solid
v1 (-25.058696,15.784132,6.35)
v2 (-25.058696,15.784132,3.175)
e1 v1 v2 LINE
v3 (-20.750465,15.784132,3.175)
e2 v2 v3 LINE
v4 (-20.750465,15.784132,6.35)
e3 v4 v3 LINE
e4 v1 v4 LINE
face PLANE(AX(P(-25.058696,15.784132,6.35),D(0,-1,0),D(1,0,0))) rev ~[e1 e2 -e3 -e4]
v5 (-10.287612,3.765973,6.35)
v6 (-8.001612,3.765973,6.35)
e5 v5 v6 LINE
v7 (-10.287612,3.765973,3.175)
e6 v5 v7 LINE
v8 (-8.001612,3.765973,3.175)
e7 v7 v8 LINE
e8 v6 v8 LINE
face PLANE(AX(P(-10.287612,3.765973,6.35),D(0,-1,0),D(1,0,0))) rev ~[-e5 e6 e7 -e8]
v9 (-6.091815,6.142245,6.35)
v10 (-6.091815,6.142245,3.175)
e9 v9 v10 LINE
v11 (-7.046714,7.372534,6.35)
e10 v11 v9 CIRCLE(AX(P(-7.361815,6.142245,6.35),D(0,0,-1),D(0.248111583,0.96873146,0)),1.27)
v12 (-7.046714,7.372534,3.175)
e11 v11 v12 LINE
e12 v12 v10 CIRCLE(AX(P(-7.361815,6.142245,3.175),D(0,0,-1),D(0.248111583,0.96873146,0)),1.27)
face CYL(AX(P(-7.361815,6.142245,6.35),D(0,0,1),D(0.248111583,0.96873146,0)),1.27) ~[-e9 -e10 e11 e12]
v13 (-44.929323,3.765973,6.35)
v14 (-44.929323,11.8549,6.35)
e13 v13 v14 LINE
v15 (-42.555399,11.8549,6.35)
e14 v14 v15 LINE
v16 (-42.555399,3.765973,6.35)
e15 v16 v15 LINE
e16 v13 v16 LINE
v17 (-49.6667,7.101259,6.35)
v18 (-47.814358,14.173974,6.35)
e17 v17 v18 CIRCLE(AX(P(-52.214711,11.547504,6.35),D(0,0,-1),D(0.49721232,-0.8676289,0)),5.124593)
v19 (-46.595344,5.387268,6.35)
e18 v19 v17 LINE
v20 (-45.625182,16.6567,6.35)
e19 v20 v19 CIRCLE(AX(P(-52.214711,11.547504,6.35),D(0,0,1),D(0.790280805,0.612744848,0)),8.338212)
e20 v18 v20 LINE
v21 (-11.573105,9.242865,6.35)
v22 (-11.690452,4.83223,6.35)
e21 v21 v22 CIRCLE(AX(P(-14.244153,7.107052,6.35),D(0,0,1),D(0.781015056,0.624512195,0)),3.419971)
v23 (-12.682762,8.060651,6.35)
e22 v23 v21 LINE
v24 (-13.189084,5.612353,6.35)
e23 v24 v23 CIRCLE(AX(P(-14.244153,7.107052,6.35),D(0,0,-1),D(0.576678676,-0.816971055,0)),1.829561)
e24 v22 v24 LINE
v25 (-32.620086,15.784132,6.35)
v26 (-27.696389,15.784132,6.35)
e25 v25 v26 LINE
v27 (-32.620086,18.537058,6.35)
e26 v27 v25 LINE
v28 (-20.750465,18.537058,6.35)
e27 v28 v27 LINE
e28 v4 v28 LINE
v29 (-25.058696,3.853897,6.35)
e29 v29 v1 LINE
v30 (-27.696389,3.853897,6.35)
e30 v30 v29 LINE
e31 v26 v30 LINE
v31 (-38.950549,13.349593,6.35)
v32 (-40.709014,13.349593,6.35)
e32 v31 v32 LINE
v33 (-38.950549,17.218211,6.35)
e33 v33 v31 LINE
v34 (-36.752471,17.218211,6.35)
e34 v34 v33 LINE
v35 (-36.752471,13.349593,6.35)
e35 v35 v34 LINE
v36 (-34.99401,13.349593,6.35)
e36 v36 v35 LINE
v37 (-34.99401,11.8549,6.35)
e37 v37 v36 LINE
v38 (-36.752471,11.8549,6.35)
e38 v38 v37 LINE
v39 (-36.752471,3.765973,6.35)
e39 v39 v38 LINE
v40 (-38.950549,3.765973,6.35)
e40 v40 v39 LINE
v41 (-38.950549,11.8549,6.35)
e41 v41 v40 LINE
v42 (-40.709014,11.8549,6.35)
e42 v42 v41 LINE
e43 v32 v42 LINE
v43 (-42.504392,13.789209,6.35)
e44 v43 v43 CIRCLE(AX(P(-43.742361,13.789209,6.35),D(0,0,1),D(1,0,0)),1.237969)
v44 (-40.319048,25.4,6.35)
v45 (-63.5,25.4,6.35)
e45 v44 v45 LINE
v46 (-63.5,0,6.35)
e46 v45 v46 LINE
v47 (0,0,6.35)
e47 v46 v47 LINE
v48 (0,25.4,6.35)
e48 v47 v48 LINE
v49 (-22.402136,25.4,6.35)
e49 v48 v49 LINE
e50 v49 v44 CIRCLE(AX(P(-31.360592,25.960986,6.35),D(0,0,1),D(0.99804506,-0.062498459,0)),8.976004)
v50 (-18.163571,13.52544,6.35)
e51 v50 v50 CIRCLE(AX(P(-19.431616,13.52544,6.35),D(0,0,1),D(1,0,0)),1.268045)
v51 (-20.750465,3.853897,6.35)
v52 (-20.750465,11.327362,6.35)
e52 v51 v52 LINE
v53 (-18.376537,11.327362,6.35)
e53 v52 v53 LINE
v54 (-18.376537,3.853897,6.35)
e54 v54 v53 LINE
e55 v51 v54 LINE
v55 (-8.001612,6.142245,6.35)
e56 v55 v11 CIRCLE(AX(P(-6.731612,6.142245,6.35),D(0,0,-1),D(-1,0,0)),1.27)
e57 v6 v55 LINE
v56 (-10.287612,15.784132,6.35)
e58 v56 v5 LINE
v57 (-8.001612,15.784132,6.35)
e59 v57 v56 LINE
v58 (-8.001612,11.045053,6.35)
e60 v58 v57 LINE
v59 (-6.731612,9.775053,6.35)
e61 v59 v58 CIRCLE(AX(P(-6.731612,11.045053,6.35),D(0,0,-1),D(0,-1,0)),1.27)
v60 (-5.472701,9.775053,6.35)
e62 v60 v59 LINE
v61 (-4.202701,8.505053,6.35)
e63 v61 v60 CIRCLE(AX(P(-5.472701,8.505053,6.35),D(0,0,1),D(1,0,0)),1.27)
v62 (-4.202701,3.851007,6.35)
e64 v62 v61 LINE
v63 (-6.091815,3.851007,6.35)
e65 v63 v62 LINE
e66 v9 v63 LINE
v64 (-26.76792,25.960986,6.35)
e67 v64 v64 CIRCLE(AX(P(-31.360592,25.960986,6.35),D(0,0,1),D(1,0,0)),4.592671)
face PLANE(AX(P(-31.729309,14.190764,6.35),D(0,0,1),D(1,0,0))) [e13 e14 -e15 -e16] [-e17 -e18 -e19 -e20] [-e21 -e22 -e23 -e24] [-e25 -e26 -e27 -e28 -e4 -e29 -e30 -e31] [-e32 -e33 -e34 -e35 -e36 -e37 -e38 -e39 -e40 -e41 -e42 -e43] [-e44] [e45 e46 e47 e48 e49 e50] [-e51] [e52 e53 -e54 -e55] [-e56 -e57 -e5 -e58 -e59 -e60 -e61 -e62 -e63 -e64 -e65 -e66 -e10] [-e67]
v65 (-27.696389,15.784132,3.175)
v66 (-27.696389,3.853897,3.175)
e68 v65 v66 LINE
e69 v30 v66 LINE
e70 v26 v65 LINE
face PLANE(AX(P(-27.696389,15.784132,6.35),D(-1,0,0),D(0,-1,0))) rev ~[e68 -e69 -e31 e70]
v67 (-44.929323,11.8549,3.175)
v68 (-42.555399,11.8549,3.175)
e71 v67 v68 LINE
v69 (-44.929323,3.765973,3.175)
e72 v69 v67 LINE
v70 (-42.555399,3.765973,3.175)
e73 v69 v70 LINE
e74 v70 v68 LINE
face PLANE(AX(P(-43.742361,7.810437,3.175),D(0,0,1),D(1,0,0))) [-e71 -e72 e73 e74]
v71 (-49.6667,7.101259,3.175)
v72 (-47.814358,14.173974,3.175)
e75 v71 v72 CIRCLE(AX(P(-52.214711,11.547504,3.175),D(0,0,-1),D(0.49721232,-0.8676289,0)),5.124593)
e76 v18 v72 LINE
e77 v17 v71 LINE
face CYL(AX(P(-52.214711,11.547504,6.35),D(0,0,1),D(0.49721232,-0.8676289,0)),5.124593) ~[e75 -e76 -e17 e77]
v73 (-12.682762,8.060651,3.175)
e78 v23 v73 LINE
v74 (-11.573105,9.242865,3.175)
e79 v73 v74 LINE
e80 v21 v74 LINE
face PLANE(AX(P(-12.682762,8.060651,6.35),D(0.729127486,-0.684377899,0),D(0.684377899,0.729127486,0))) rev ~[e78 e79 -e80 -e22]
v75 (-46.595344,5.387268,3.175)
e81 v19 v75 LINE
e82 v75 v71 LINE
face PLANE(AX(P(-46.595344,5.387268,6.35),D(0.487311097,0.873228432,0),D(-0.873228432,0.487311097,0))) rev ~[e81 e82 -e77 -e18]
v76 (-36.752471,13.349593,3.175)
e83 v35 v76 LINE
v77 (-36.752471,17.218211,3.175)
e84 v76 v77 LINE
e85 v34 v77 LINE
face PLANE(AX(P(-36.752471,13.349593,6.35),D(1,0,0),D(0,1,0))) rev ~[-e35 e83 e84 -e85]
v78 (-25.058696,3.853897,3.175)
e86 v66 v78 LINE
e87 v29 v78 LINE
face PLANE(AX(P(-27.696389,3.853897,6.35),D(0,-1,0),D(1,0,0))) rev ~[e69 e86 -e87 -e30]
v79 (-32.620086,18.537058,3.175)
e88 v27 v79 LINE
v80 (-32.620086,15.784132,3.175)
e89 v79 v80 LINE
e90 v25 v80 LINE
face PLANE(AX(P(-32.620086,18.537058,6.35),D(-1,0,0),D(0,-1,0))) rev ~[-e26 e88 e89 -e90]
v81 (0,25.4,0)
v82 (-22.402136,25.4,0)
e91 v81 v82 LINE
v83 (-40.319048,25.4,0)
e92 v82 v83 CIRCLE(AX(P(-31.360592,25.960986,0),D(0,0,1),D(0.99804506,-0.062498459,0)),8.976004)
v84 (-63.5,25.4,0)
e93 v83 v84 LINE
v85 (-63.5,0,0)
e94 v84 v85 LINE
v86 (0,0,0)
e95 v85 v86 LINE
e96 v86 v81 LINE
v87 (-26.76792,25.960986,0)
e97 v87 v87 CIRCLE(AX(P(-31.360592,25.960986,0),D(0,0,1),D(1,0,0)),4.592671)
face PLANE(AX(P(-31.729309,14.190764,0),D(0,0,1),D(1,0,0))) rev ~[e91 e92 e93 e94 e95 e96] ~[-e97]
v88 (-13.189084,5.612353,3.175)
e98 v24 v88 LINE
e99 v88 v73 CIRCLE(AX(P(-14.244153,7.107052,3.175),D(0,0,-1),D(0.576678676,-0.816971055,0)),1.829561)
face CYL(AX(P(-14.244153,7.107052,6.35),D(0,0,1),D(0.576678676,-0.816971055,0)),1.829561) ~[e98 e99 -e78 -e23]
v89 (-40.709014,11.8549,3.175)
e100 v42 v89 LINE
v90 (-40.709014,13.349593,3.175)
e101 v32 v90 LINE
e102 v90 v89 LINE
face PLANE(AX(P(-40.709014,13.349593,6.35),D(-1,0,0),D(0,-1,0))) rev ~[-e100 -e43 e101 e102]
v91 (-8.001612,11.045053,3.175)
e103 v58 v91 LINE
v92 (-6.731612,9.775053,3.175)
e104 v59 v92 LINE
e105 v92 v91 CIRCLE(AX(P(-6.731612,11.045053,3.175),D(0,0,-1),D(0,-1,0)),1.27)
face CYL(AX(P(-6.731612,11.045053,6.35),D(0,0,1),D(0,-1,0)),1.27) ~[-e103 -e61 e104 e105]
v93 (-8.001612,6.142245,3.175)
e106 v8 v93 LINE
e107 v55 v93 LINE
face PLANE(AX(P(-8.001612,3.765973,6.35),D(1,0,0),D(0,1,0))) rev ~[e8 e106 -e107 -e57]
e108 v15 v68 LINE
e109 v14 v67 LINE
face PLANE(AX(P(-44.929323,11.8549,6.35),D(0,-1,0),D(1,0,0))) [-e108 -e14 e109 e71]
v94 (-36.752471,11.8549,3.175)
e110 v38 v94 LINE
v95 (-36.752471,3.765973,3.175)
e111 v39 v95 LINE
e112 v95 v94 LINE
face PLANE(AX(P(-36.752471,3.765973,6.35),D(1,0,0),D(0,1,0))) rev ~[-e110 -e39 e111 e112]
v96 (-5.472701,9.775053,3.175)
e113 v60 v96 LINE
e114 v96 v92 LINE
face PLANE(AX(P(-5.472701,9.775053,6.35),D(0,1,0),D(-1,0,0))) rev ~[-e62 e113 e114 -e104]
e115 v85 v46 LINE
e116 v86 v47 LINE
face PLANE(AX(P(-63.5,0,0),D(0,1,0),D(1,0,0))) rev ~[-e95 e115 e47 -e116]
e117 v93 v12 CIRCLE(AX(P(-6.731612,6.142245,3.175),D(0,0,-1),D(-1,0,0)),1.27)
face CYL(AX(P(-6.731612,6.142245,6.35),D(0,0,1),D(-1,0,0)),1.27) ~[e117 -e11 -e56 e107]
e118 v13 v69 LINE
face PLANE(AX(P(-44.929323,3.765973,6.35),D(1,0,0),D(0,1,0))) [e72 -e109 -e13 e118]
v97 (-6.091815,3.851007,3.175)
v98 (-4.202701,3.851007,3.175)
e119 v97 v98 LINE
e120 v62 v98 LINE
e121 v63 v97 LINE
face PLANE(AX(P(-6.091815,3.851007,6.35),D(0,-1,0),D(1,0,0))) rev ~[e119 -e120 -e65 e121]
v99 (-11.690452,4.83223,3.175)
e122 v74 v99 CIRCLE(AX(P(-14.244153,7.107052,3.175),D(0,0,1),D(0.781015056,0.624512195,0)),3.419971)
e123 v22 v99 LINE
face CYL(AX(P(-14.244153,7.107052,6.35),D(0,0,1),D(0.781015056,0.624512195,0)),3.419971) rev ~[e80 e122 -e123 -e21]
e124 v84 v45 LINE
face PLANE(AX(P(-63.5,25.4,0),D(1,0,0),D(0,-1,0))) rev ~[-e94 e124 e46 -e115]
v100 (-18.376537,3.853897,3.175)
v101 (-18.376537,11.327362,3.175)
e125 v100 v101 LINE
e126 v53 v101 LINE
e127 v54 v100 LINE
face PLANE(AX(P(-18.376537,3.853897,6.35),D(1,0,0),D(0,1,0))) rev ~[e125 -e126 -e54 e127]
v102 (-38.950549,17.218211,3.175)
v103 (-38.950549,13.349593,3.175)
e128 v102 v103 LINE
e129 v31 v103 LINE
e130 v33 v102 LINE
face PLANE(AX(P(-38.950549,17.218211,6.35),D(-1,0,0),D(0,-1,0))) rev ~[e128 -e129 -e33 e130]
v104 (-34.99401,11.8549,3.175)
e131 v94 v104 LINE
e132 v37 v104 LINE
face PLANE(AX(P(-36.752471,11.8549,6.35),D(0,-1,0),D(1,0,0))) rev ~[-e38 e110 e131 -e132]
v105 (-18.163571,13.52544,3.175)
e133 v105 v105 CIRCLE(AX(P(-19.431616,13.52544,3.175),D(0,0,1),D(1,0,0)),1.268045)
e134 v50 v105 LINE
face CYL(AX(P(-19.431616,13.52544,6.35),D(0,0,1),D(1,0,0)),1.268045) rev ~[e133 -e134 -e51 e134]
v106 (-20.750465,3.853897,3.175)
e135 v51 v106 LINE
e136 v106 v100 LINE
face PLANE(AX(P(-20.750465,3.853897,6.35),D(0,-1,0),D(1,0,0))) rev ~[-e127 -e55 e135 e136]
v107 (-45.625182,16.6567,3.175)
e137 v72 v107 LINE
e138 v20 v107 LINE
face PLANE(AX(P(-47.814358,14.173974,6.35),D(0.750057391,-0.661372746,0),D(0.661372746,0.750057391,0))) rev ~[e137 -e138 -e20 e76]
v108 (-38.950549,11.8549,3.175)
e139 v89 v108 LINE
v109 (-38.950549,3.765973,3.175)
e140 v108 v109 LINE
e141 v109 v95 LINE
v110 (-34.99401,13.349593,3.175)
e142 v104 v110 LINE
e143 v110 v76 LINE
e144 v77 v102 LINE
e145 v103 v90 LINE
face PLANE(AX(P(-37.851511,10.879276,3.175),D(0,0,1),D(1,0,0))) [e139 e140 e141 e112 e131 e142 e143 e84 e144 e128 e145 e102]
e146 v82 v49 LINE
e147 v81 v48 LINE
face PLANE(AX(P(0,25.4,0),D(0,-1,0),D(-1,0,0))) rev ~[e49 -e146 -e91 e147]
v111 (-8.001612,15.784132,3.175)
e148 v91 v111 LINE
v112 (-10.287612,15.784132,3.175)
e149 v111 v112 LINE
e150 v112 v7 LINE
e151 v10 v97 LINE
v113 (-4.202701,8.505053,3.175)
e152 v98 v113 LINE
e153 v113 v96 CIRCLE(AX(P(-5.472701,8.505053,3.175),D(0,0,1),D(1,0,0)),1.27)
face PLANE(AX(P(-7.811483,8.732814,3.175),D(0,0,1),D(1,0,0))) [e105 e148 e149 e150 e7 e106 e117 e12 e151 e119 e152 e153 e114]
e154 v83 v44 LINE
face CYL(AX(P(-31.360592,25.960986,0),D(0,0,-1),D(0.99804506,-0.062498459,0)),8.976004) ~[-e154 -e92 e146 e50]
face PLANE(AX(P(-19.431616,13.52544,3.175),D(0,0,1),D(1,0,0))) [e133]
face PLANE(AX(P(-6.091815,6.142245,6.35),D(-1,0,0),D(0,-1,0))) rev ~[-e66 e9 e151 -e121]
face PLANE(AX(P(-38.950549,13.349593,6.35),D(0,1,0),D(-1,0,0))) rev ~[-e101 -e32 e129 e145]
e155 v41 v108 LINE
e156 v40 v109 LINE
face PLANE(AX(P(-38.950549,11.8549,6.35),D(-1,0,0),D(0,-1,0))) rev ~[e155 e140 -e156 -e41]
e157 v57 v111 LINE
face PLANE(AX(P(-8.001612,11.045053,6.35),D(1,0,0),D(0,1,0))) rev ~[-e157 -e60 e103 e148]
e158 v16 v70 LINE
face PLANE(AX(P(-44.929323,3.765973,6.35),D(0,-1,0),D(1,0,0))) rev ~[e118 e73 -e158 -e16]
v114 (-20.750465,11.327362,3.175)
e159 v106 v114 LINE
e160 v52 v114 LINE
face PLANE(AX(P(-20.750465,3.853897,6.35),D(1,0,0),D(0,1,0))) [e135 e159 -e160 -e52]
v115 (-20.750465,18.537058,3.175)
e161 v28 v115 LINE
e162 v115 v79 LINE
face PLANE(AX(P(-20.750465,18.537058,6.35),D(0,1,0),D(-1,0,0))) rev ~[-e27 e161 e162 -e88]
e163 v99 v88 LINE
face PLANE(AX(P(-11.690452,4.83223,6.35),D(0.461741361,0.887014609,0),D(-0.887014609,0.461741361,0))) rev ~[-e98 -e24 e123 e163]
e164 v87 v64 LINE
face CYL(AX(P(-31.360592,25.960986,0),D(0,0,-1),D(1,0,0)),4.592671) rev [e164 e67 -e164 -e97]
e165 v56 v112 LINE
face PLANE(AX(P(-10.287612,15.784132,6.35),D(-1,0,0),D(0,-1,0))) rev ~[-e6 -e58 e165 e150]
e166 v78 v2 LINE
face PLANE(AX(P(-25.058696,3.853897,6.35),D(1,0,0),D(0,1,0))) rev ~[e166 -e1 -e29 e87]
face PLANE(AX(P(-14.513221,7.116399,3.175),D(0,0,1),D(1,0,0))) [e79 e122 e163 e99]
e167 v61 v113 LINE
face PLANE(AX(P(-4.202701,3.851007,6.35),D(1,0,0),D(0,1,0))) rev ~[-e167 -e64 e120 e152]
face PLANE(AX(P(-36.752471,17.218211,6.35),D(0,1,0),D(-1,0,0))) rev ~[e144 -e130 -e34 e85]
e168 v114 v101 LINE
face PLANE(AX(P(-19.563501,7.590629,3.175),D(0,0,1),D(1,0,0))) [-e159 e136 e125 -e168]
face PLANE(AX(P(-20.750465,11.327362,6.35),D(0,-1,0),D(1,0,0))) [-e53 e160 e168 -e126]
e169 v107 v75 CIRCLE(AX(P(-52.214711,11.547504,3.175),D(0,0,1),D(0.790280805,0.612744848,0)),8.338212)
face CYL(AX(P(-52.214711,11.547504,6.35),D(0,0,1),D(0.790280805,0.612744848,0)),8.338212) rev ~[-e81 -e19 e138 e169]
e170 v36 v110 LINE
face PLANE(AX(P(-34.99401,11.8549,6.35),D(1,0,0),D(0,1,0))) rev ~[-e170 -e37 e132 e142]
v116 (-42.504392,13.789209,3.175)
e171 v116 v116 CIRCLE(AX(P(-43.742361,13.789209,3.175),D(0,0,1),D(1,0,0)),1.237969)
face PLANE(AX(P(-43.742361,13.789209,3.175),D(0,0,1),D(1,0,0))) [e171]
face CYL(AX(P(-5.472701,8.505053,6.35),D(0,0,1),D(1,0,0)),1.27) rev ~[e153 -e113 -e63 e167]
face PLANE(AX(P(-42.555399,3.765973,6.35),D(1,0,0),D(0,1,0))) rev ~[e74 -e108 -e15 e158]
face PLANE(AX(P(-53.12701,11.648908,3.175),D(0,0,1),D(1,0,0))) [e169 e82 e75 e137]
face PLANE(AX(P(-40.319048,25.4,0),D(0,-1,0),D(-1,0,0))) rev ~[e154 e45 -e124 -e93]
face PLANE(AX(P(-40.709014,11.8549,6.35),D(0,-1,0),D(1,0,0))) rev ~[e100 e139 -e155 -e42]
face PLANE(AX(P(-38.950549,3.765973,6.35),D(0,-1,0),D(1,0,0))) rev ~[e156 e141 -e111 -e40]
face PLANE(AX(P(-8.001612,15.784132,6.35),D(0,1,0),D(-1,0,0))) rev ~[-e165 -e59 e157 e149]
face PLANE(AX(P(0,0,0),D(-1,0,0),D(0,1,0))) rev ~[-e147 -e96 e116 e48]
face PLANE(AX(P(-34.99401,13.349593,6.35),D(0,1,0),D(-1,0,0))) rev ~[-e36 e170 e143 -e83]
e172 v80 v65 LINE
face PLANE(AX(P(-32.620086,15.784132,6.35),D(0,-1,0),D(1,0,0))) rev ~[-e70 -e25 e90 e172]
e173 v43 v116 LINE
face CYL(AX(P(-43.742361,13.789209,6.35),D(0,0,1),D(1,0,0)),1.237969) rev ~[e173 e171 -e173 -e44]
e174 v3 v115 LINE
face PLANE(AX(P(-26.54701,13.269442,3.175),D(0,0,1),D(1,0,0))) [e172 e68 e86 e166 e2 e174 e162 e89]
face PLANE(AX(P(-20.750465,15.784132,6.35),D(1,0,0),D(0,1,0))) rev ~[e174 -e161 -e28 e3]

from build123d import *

# Parameters (mm, degrees)
F0_R     = 4.5926712991
F1_DEPTH = 6.35
F2_W     = 2.3739238567
F2_H     = 8.0889270103
F2_W_2   = 2.3739274609
F2_H_2   = 7.4734649694
F2_R     = 1.2680453983
F2_R_2   = 1.2379691671
F3_DEPTH = 3.175


# Not quite as in the source:
# - a length typed as a fraction of an inch, garbled in the dataset ("3 / 203.2 mm" for 3/8 in), is restored


with BuildPart() as f1:
    # F0 (on Top) → F1 (new body)
    with BuildSketch(Plane.XY):
        with BuildLine():
            Line((-63.5, 0), (0, 0))
            Line((0, 0), (0, 25.4))
            Line((0, 25.4), (-22.4021356553, 25.4))
            ThreePointArc((-22.4021356553, 25.4), (-31.3605917618, 34.9369900473), (-40.3190478683, 25.4))
            Line((-40.3190478683, 25.4), (-63.5, 25.4))
            Line((-63.5, 25.4), (-63.5, 0))
        make_face()
        with Locations((-31.3605917618, 25.960986396)):
            Circle(F0_R, mode=Mode.SUBTRACT)
    extrude(amount=F1_DEPTH)

    # F2 (on face) → F3 (cut)
    with BuildSketch(Plane.XY.offset(6.35)):
        with BuildLine():
            Line((-47.8143577063, 14.1739739048), (-45.6251816468, 16.6567004661))
            ThreePointArc((-45.6251816468, 16.6567004661), (-60.5221954701, 12.262678636), (-46.5953443626, 5.3872683266))
            Line((-46.5953443626, 5.3872683266), (-49.6666999843, 7.1012593313))
            ThreePointArc((-49.6666999843, 7.1012593313), (-57.1721052058, 12.8458444774), (-47.8143577063, 14.1739739048))
        make_face()
        Polygon((-20.7504647221, 18.5370575163), (-32.6200858075, 18.5370575163), (-32.6200858075, 15.7841322933), (-27.6963894798, 15.7841322933), (-27.6963894798, 3.8538966697), (-25.0586963057, 3.8538966697), (-25.0586963057, 15.7841322933), (-20.7504647221, 15.7841322933), align=None)
        with BuildLine():
            Line((-8.0016118277, 15.7841322933), (-10.2876118277, 15.7841322933))
            Line((-10.2876118277, 15.7841322933), (-10.2876118277, 3.7659732636))
            Line((-10.2876118277, 3.7659732636), (-8.0016118277, 3.7659732636))
            Line((-8.0016118277, 3.7659732636), (-8.0016118277, 6.1422445658))
            ThreePointArc((-8.0016118277, 6.1422445658), (-7.7348762924, 6.9209360412), (-7.0467135382, 7.3725335205))
            ThreePointArc((-7.0467135382, 7.3725335205), (-6.358550784, 6.9209360412), (-6.0918152487, 6.1422445658))
            Line((-6.0918152487, 6.1422445658), (-6.0918152487, 3.8510074993))
            Line((-6.0918152487, 3.8510074993), (-4.2027005772, 3.8510074993))
            Line((-4.2027005772, 3.8510074993), (-4.2027005772, 8.5050527784))
            ThreePointArc((-4.2027005772, 8.5050527784), (-4.5746749651, 9.4030783905), (-5.4727005772, 9.7750527784))
            Line((-5.4727005772, 9.7750527784), (-6.7316118277, 9.7750527784))
            ThreePointArc((-6.7316118277, 9.7750527784), (-7.6296374398, 10.1470271663), (-8.0016118277, 11.0450527784))
            Line((-8.0016118277, 11.0450527784), (-8.0016118277, 15.7841322933))
        make_face()
        with BuildLine():
            ThreePointArc((-6.7316118277, 7.4122445658), (-6.8904089113, 7.4022776948), (-7.0467135382, 7.3725335205))
            ThreePointArc((-7.0467135382, 7.3725335205), (-7.203018165, 7.4022776948), (-7.3618152487, 7.4122445658))
            Line((-7.3618152487, 7.4122445658), (-6.7316118277, 7.4122445658))
        make_face(mode=Mode.SUBTRACT)
        Polygon((-36.7524705789, 17.2182109293), (-38.9505494254, 17.2182109293), (-38.9505494254, 13.3495927722), (-40.7090139442, 13.3495927722), (-40.7090139442, 11.8549002739), (-38.9505494254, 11.8549002739), (-38.9505494254, 3.7659732636), (-36.7524705789, 3.7659732636), (-36.7524705789, 11.8549002739), (-34.9940096642, 11.8549002739), (-34.9940096642, 13.3495927722), (-36.7524705789, 13.3495927722), align=None)
        with BuildLine():
            Line((-12.6827618144, 8.0606505512), (-11.5731045271, 9.2428652738))
            ThreePointArc((-11.5731045271, 9.2428652738), (-17.6629146287, 7.19801004), (-11.6904523614, 4.8322301544))
            Line((-11.6904523614, 4.8322301544), (-13.1890844097, 5.6123530456))
            ThreePointArc((-13.1890844097, 5.6123530456), (-16.0358025283, 7.4775754374), (-12.6827618144, 8.0606505512))
        make_face()
        with Locations((-43.7423610944, 7.8104367687)):
            Rectangle(F2_W, F2_H)
        with Locations((-19.5635009916, 7.5906291544)):
            Rectangle(F2_W_2, F2_H_2)
        with Locations((-19.4316163329, 13.5254395845)):
            Circle(F2_R)
        with Locations((-43.7423610944, 13.7892089019)):
            Circle(F2_R_2)
        with BuildLine():
            ThreePointArc((-7.3618152487, 7.4122445658), (-7.203018165, 7.4022776948), (-7.0467135382, 7.3725335205))
            ThreePointArc((-7.0467135382, 7.3725335205), (-6.8904089113, 7.4022776948), (-6.7316118277, 7.4122445658))
            Line((-6.7316118277, 7.4122445658), (-7.3618152487, 7.4122445658))
        make_face()
    extrude(amount=-F3_DEPTH, mode=Mode.SUBTRACT)


solid = f1.part
